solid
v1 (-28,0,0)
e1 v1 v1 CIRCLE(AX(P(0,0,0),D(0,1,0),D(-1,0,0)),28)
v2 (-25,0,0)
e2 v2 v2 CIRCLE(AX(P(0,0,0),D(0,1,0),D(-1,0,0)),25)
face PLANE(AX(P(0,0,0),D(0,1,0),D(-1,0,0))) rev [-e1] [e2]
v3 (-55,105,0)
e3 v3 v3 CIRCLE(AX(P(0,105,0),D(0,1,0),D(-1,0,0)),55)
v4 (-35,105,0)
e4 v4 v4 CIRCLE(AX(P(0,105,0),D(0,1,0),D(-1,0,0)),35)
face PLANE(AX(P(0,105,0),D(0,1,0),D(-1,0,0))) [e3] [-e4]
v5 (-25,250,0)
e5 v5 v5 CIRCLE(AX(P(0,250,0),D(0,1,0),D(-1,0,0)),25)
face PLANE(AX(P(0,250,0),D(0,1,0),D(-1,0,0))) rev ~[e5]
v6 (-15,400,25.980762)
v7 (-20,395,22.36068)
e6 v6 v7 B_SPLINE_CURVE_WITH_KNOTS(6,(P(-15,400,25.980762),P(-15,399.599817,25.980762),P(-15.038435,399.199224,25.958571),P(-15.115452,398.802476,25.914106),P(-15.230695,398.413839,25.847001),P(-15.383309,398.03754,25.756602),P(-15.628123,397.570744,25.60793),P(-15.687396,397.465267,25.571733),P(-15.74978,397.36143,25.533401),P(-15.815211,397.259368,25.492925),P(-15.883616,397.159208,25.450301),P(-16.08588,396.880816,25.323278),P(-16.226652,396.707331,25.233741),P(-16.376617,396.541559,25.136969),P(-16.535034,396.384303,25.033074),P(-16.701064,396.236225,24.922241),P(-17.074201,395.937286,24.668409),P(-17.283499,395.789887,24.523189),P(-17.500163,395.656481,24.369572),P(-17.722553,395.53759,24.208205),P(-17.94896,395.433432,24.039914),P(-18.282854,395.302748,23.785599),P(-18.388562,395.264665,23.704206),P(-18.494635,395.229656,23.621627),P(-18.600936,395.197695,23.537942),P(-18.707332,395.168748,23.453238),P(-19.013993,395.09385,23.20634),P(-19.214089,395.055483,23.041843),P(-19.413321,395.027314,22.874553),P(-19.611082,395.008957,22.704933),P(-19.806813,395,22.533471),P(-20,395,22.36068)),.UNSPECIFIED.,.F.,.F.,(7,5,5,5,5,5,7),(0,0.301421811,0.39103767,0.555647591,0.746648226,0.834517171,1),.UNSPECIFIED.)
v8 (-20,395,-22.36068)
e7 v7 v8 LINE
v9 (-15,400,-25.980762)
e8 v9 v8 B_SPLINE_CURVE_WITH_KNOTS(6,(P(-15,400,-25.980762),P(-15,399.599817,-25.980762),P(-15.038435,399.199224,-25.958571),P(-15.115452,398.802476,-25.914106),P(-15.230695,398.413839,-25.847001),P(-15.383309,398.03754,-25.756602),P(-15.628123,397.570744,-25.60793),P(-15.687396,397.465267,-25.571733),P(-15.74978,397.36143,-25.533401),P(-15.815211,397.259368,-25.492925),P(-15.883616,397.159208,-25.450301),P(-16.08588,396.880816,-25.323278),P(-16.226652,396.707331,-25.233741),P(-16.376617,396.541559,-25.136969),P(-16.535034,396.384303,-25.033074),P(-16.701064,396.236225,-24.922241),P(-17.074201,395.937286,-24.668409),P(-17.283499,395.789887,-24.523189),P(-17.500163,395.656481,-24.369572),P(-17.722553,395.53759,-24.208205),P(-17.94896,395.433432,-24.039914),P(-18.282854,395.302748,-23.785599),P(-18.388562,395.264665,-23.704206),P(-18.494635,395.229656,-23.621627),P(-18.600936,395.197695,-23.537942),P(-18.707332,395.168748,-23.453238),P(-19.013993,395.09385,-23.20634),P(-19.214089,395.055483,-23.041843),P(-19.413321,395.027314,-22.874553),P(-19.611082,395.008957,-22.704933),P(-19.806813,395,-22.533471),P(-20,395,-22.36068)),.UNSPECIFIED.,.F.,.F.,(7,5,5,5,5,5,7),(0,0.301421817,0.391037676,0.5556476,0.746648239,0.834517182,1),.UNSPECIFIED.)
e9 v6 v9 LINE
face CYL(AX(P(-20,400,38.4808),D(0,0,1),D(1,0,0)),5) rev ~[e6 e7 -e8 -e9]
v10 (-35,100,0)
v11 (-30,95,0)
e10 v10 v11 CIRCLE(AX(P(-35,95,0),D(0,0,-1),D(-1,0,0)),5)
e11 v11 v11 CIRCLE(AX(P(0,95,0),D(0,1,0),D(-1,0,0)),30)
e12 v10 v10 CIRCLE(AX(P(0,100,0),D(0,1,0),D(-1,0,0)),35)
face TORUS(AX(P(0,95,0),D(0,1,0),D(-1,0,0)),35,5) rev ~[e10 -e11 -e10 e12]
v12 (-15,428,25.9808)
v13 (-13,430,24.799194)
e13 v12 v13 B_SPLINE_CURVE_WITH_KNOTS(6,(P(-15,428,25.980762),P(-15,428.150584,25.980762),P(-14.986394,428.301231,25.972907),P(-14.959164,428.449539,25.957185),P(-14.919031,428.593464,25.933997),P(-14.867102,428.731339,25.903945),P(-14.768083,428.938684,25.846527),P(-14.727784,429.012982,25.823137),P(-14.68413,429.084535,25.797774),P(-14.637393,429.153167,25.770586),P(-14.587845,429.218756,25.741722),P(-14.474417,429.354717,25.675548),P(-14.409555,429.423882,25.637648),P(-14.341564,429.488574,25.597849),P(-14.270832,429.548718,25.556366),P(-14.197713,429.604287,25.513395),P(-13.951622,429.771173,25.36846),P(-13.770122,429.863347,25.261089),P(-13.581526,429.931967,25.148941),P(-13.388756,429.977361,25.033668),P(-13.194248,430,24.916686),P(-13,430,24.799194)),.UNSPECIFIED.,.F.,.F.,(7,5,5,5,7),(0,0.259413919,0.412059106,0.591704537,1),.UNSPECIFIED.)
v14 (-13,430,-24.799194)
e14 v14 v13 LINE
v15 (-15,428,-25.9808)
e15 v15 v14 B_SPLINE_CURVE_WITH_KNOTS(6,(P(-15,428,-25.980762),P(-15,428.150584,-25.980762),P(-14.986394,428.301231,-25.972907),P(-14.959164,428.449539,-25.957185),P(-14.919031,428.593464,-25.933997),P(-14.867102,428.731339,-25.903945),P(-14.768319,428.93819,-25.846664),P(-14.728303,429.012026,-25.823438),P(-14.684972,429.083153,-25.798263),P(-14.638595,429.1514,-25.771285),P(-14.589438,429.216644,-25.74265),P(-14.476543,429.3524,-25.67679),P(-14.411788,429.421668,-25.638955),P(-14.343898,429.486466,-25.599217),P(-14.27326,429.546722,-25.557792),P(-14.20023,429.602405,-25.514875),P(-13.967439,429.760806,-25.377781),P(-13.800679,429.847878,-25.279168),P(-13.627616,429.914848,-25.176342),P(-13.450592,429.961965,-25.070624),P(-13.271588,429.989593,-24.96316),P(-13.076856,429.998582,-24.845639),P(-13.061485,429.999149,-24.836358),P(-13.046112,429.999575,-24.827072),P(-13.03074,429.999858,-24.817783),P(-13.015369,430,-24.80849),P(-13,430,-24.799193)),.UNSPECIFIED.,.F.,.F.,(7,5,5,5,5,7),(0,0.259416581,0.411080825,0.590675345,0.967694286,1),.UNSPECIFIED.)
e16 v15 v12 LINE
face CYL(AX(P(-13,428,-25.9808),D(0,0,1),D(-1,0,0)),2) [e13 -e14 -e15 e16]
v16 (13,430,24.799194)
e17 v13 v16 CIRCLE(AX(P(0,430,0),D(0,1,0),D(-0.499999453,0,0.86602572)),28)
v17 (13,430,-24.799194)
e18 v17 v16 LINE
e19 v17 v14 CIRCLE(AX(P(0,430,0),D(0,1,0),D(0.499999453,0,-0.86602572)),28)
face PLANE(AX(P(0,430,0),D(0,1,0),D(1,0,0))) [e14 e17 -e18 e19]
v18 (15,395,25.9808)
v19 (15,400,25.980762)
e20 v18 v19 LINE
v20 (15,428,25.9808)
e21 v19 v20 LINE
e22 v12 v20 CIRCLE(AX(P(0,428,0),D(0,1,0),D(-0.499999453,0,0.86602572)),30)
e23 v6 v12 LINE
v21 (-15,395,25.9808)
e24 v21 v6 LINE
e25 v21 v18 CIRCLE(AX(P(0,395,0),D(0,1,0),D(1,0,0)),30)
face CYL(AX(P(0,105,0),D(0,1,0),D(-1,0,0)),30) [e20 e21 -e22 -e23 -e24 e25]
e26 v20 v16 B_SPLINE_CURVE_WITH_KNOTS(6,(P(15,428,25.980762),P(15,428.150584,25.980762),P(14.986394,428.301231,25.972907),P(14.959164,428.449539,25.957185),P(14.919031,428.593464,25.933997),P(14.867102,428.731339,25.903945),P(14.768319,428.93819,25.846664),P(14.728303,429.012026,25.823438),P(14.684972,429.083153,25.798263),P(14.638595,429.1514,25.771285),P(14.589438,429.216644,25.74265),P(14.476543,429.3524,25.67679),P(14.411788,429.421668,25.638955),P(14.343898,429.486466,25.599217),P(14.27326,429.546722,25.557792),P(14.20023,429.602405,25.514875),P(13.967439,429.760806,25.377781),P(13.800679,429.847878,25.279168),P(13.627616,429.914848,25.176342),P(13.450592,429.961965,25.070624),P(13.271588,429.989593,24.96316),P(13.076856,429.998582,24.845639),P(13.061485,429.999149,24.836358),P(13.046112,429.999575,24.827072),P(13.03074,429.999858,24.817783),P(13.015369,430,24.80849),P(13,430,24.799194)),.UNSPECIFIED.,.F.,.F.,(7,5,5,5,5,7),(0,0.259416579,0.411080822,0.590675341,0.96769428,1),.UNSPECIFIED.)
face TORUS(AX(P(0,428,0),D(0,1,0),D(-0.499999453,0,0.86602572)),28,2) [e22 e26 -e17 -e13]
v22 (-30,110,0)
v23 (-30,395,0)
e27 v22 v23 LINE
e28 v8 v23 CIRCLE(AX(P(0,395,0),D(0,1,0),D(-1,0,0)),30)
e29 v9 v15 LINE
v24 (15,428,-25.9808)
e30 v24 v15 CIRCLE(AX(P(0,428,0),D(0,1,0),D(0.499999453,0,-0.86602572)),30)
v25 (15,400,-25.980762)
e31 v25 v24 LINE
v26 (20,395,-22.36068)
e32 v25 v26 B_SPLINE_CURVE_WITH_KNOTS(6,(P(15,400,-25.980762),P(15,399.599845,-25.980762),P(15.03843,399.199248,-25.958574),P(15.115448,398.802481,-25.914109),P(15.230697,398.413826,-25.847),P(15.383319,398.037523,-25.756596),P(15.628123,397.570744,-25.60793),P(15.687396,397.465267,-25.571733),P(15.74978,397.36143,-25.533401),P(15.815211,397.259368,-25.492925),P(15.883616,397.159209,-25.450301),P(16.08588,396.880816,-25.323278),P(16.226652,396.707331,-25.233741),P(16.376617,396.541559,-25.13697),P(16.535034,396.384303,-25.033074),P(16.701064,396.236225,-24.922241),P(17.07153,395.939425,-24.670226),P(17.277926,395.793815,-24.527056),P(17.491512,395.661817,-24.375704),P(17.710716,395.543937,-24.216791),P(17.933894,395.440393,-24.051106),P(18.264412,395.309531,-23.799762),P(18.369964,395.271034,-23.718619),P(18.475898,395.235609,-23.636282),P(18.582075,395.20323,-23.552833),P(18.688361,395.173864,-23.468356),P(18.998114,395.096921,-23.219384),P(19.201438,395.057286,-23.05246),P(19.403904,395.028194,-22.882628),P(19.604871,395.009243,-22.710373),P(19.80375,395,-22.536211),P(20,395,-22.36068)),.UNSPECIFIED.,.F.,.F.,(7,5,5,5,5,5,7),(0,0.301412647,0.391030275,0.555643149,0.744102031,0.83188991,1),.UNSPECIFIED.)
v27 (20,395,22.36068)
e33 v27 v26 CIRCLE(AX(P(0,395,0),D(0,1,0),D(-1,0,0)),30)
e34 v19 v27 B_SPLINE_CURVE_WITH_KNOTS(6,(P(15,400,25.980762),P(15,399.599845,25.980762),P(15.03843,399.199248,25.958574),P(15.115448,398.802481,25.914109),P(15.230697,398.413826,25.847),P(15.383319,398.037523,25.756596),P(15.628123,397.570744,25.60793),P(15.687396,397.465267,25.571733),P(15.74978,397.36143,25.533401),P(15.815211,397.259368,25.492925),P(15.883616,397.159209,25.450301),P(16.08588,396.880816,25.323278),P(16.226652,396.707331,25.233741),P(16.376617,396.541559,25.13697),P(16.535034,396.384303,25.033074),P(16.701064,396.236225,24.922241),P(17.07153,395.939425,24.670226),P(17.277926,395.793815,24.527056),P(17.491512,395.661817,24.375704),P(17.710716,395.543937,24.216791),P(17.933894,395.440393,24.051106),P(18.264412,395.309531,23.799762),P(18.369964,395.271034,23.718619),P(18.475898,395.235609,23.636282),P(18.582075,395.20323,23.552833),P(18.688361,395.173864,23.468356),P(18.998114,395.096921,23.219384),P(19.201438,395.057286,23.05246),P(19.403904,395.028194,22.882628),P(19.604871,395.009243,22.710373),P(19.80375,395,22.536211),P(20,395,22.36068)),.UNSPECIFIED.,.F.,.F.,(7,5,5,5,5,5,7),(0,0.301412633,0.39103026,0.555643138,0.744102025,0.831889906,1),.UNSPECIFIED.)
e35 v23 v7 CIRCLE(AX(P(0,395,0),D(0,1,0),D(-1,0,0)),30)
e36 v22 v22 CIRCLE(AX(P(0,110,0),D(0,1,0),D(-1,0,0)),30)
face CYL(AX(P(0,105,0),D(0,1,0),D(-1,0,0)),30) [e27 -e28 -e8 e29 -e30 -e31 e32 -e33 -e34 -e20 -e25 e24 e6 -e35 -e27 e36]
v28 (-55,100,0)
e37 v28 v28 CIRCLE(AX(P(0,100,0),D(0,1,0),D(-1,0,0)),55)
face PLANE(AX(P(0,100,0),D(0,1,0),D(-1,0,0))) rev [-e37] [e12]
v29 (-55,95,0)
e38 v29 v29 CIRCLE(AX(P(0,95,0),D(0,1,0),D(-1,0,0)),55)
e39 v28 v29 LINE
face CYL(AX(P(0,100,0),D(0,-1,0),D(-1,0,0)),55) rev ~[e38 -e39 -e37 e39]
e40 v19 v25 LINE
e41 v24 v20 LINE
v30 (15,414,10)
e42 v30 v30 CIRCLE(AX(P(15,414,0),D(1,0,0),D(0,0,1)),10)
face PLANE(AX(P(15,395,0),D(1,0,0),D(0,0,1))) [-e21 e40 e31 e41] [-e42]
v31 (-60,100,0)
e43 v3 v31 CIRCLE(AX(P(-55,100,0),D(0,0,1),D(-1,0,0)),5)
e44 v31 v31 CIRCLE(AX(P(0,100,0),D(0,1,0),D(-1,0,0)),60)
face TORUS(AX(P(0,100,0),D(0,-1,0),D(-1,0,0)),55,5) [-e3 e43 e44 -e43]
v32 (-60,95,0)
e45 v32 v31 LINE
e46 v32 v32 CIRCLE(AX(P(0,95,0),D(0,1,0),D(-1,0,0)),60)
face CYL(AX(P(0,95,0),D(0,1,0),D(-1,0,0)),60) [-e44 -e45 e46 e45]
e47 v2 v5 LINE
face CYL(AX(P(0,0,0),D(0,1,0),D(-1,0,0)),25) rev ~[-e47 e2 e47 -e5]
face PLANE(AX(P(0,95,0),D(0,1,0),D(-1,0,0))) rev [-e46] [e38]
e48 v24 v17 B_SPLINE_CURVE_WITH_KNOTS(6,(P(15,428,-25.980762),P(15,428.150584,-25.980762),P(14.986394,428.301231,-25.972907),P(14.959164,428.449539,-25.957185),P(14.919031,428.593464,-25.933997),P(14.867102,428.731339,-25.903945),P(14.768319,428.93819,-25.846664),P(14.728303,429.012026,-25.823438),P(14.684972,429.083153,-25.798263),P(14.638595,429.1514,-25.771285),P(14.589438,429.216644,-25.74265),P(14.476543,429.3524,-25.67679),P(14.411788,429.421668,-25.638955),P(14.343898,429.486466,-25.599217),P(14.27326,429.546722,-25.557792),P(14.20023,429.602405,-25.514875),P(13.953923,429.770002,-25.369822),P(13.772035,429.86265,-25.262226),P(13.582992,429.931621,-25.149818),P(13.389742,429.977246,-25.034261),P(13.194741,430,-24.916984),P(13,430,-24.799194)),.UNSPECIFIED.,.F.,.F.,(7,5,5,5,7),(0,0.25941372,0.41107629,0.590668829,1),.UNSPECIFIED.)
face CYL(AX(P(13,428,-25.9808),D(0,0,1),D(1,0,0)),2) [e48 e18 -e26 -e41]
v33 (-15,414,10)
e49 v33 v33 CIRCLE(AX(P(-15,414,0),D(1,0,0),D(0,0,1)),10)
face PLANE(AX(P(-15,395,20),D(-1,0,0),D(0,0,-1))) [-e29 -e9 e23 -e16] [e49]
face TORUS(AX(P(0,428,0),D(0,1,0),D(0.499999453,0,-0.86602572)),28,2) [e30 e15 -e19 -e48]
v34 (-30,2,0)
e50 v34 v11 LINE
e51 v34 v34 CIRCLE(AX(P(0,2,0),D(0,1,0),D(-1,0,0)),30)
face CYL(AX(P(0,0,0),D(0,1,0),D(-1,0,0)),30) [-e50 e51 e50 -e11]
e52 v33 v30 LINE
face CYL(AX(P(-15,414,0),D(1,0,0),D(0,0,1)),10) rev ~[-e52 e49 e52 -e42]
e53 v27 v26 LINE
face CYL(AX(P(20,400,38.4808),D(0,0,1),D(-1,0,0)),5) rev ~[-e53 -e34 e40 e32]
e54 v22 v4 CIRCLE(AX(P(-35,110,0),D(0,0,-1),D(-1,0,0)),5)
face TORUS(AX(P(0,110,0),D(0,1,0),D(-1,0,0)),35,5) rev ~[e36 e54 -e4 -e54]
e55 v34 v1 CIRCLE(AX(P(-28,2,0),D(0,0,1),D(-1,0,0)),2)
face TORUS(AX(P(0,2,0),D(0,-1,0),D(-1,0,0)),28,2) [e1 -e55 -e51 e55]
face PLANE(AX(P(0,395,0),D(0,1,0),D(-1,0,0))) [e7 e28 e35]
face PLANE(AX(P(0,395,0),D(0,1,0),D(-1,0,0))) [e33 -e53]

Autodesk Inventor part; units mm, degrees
ref_plane "YZ Plane" through (0, 0, 0) normal (1, 0, 0) x (0, 1, 0)
ref_plane "XZ Plane" through (0, 0, 0) normal (0, 1, 0) x (-1, 0, 0)
ref_plane "XY Plane" through (0, 0, 0) normal (0, 0, 1) x (1, 0, 0)
sketch "Sketch1" plane through (0, 0, 0) normal (0, 0, 1) x (1, 0, 0)
  line L0 (25, 0) -> (30, 0)
  line L1 (30, 0) -> (30, 100)
  line L2 (30, 100) -> (55, 100)
  line L3 (55, 100) -> (55, 95)
  line L4 (55, 95) -> (60, 95)
  line L5 (60, 95) -> (60, 105)
  line L6 (60, 105) -> (30, 105)
  line L7 (30, 105) -> (30, 395)
  line L8 (30, 395) -> (0, 395)
  line L9 (0, 250) -> (0, 395)
  line L10 (25, 0) -> (25, 250)
  line L11 (25, 250) -> (0, 250)
  line L12 (0, 0) -> (0, 395)
  dimension "d0" = 25
  dimension "d1" = 5
  dimension "d2" = 100
  dimension "d3" = 25
  dimension "d4" = 5
  dimension "d5" = 5
  dimension "d6" = 10
  dimension "d7" = 290
  dimension "d8" = 250
revolve "Revolution1" add sketch "Sketch1" angle 360 mid plane about axis through (0, 0, 0) along (0, 1, 0)
fillet "Fillet1" radius 5 3 edges at (30, 105, 0) (60, 105, 0) (30, 100, 0)
sketch "Sketch2" plane through (0, 395, 0) normal (0, 1, 0) x (1, 0, 0)
  line L0 (15, 0) -> (-15, 0)
  circle A0 centre (0, 0) radius 25 projected
  circle A1 centre (0, 0) radius 30 projected
  line L1 (-15, -25.9808) -> (-15, 25.9808)
  line L2 (15, 0) -> (15, -25.9808)
  line L3 (15, -25.9808) -> (15, 25.9808)
  arc A2 (15, 25.9808) -> (-15, 25.9808) centre (0, 0) ccw
  arc A3 (-15, -25.9808) -> (15, -25.9808) centre (0, 0) ccw
  dimension "d11" = 15
  dimension "d12" = 30
extrude "Extrusion1" add sketch "Sketch2" along normal blind 35 contours L2 A0 L1 L0 | L0 L1 A0 L3 | L2 A1 L1 A0 | A0 L1 A1 L3
fillet "Fillet2" radius 2 4 edges at (-15, 430, 0) (15, 430, 12.9904) (0, 430, -30) (0, 430, 30)
fillet "Fillet3" radius 5 2 edges at (-15, 395, 0) (15, 395, 12.9904)
sketch "Sketch3" plane through (-15, 428, -25.9808) normal (-1, 0, 0) x (0, 0, 1)
  line L0 (0, -28) -> (0, 0) projected
  line L1 (0, 0) -> (51.9615, 0) projected
  line L2 (0, -28) -> (51.9615, -28) projected
  circle A0 centre (25.9808, -14) radius 10
  point P0 (25.9808, -428)
  dimension "d17" = 20
hole "Hole1" at (-15, 414, 0) direction (1, 0, 0) diameter 20 end through all
fillet "Fillet4" radius 2 1 edges at (30, 0, 0)
properties part number "shield" material "Steel, High Strength, Low Alloy"
